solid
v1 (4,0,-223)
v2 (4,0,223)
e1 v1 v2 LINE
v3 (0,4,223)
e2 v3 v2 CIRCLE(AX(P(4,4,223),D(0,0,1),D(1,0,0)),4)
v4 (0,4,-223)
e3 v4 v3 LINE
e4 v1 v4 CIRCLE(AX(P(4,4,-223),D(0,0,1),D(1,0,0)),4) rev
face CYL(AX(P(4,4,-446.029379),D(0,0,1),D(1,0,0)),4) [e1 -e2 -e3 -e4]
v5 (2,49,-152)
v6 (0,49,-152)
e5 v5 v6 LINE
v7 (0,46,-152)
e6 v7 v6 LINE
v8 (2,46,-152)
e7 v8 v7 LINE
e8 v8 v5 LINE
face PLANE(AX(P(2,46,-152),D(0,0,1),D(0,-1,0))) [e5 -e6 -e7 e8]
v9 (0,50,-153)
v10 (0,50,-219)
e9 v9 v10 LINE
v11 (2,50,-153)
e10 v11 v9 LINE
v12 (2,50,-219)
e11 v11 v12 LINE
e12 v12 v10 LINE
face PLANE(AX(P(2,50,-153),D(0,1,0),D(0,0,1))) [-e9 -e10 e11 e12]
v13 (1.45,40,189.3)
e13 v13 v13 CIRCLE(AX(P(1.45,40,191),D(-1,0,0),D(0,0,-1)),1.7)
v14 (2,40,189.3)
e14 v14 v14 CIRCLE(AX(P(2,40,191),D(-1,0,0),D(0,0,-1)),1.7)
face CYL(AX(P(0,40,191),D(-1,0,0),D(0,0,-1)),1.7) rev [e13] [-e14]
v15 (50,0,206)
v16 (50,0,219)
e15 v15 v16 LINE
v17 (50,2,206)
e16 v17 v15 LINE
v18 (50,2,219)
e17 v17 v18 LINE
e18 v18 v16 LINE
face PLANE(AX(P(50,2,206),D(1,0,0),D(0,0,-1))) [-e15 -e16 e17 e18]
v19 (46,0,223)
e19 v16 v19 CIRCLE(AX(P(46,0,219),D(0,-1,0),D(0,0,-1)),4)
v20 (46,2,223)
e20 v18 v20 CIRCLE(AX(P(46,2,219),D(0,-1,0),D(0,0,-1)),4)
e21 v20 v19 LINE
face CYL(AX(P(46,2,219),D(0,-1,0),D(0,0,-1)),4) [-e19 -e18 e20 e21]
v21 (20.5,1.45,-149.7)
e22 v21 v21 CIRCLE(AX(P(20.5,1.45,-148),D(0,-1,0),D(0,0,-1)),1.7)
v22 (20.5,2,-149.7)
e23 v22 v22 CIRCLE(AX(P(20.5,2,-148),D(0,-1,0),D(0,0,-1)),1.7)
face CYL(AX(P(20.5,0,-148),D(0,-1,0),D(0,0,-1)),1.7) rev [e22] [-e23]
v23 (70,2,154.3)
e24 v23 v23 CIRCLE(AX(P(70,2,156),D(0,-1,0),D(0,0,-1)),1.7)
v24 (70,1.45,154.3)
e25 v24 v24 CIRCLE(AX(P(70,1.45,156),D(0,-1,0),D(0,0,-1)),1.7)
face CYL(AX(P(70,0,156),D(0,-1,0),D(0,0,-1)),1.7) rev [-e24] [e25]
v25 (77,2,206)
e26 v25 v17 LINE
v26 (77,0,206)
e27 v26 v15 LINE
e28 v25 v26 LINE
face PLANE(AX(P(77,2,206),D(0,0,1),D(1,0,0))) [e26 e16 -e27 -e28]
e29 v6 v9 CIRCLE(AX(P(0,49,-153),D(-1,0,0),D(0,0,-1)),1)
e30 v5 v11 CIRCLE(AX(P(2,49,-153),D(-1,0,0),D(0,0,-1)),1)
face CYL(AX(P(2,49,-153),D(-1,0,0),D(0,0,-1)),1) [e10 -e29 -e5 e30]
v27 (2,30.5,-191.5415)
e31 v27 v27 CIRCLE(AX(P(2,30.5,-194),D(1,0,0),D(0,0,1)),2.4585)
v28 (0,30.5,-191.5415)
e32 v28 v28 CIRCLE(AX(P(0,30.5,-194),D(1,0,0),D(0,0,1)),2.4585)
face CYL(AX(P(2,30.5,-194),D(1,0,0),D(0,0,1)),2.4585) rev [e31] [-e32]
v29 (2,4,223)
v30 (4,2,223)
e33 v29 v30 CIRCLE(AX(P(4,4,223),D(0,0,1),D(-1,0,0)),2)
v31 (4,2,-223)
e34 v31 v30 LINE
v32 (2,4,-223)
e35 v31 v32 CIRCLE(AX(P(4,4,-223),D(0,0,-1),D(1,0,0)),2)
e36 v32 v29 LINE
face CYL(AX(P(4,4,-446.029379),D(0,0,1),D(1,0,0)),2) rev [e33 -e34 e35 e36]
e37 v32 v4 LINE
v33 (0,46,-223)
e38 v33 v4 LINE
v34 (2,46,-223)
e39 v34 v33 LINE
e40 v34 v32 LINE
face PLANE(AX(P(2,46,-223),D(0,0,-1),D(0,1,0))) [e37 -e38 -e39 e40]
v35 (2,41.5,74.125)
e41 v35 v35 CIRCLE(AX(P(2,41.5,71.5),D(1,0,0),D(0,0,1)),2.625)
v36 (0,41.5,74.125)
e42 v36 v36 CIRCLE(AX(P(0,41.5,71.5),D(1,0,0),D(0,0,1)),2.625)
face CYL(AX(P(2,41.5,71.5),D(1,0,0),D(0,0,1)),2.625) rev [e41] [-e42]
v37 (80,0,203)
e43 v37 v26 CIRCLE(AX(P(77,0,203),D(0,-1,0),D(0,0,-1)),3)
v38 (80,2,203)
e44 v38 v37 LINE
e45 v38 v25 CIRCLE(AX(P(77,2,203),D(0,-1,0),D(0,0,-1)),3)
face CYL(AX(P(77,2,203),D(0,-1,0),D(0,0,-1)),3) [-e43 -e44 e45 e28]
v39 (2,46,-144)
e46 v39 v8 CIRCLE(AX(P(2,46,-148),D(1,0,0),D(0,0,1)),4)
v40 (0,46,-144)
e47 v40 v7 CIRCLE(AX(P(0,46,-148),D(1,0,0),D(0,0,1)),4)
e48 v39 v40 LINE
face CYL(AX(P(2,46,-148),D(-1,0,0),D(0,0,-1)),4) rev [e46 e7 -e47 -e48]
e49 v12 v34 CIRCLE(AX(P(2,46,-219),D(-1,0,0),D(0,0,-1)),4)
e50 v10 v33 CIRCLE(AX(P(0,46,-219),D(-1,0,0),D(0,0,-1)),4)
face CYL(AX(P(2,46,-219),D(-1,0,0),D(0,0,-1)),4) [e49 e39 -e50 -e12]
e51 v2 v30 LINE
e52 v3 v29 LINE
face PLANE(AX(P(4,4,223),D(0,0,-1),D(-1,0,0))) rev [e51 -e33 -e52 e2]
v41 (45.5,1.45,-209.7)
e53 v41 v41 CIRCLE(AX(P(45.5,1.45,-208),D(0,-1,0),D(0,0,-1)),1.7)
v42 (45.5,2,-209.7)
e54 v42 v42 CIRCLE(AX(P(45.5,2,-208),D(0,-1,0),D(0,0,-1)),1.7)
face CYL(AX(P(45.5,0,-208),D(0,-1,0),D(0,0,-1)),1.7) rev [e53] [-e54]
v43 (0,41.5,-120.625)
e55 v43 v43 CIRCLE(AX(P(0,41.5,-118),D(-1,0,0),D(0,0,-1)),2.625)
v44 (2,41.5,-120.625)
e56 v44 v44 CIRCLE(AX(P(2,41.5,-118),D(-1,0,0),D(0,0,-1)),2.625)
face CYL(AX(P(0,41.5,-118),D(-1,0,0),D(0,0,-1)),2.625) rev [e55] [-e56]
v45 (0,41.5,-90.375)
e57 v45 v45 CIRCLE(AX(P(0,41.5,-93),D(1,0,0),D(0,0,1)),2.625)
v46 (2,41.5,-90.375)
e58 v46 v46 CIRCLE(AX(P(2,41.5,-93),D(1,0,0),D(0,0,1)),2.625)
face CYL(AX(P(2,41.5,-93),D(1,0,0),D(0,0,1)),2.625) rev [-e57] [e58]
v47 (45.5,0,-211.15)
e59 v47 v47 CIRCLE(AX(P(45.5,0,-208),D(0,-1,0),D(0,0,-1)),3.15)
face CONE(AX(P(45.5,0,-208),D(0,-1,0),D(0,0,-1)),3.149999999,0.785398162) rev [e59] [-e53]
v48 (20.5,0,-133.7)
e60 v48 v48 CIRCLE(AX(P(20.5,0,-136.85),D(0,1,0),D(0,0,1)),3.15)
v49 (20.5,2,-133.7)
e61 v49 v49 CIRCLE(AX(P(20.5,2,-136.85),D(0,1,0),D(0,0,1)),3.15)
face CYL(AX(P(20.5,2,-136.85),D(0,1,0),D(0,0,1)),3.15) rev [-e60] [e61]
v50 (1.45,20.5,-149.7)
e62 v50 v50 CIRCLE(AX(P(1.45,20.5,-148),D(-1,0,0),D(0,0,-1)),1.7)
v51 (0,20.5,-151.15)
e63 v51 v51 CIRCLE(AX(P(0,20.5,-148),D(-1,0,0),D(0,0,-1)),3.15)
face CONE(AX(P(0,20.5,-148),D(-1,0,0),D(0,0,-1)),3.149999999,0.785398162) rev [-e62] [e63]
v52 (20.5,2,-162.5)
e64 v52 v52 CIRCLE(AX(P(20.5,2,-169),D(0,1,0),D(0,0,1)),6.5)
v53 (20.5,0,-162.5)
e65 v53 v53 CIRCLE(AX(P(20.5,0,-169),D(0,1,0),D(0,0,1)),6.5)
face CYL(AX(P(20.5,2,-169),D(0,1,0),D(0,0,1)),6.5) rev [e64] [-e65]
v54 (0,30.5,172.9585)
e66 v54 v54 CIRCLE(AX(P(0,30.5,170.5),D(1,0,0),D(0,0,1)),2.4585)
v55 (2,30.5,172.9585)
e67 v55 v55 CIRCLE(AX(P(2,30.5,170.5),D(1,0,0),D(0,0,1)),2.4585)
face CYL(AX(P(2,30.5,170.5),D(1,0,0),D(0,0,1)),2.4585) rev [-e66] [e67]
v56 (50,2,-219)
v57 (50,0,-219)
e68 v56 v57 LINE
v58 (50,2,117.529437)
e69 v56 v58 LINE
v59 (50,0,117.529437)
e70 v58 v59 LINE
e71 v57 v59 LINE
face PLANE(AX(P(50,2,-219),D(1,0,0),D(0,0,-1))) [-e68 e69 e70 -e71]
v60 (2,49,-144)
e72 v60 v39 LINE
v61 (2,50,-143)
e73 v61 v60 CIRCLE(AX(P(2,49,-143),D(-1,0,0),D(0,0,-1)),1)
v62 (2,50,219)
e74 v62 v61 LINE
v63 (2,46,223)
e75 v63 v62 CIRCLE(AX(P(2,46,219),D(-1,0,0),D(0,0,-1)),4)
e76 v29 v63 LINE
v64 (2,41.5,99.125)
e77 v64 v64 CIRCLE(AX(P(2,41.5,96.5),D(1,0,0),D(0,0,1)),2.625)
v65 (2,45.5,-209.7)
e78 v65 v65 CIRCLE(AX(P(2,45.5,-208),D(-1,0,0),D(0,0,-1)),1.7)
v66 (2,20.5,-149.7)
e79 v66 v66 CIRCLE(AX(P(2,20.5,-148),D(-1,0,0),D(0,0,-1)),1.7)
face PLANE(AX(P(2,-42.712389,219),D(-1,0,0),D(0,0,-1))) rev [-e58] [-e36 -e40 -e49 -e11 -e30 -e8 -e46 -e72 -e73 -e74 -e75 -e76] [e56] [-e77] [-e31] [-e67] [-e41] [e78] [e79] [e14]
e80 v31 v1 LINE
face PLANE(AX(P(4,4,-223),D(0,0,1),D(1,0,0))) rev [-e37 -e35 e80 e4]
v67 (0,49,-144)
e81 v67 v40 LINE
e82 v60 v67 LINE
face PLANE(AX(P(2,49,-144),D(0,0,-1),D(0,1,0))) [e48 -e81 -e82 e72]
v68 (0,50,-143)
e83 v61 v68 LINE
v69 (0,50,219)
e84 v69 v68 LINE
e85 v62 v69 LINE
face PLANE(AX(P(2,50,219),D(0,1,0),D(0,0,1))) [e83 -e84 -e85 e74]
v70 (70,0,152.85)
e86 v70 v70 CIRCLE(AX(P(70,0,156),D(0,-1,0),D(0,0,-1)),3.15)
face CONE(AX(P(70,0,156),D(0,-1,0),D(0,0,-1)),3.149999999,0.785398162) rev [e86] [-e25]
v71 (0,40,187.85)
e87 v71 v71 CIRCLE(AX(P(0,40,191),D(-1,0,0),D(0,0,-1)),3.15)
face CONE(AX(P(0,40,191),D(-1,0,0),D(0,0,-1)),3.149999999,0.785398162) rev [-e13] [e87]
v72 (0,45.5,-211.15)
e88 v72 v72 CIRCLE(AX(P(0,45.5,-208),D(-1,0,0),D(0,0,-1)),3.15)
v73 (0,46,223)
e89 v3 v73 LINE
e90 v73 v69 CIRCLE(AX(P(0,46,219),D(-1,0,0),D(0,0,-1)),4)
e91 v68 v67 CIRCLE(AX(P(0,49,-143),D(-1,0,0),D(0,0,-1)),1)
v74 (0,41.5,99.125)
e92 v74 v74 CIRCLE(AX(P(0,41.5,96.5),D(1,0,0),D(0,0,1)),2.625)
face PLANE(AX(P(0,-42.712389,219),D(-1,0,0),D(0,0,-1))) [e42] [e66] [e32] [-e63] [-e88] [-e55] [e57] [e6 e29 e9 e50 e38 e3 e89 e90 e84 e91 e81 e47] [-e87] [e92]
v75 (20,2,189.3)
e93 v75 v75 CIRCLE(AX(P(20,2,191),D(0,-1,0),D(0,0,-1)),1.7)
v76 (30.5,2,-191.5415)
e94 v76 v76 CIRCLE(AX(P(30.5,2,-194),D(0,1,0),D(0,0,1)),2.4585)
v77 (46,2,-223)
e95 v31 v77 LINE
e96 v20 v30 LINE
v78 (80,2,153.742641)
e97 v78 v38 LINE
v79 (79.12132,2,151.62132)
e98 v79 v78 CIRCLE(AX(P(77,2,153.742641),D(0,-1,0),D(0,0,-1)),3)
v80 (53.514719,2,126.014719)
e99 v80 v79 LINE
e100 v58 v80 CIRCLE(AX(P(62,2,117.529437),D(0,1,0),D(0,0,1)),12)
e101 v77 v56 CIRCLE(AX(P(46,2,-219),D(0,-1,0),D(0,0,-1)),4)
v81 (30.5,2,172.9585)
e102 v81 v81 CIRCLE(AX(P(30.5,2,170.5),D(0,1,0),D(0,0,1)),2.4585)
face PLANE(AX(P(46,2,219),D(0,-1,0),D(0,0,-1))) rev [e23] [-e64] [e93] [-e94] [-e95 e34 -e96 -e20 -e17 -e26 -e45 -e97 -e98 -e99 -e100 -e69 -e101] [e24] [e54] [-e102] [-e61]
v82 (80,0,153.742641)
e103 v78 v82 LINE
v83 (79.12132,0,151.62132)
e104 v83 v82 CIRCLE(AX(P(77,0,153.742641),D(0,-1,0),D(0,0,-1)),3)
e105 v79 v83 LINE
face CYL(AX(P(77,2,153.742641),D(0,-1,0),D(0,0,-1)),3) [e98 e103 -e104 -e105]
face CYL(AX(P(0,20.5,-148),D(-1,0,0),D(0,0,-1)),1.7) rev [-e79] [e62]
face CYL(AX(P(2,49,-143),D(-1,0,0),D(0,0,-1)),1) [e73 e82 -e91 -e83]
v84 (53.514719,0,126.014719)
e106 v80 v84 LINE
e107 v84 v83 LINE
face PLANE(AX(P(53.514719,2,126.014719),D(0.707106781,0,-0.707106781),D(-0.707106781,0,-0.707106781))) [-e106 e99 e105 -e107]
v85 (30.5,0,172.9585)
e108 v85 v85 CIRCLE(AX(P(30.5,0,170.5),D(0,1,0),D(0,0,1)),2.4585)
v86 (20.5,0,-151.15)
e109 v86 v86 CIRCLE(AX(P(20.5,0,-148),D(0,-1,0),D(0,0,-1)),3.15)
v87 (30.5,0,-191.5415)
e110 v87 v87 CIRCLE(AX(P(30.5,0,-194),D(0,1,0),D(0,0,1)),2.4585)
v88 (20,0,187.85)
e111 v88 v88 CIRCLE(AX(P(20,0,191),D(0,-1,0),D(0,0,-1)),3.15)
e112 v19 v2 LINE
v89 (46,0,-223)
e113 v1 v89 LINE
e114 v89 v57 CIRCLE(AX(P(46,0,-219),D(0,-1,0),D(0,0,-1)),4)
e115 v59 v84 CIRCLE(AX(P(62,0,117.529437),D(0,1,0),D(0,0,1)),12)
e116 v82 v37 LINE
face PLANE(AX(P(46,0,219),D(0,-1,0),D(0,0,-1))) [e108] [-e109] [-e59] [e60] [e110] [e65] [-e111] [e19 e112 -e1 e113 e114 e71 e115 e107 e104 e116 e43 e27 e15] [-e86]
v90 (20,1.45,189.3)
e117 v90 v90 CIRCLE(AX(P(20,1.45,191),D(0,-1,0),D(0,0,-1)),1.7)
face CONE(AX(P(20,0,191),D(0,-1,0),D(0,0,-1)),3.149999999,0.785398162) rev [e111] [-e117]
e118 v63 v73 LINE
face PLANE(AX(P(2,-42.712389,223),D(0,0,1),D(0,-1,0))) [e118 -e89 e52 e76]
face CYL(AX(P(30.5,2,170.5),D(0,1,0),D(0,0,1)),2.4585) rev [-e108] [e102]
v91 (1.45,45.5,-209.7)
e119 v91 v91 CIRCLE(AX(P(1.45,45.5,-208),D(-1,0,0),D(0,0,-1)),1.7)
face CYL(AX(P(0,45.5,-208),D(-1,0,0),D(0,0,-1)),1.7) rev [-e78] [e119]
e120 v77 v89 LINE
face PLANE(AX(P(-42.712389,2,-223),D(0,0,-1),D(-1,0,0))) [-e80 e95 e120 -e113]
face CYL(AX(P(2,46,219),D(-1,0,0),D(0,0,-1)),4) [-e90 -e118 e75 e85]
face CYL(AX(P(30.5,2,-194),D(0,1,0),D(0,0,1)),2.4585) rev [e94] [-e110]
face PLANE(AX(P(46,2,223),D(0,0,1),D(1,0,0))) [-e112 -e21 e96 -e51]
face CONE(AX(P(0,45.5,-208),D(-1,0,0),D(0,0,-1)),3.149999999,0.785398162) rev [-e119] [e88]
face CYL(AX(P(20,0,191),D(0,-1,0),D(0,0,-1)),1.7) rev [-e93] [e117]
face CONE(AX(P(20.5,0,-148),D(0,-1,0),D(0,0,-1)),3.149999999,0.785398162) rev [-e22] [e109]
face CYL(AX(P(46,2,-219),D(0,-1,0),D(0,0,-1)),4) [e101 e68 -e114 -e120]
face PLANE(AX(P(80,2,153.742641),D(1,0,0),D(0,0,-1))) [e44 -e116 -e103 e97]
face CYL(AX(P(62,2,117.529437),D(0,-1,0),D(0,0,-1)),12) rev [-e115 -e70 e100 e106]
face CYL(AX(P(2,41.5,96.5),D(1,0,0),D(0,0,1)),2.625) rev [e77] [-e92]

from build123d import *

# Parameters (mm, degrees)
BOSS_EXTRUDE1_DEPTH                            = 2
HOLE1_D                                        = 5.25
HOLE2_D                                        = 5.25
F_13_0_13_DIAMETER_HOLE1_D                     = 13
F_6_3_6_3_DIAMETER_HOLE1_D                     = 6.3
HOLE3_D                                        = 4.917
CSK_FOR_M3_FLAT_HEAD_MACHINE_SCREW1_AT_2_COUNT = 2
CSK_FOR_M3_FLAT_HEAD_MACHINE_SCREW1_AT_2_PITCH = 399.037905468
CSK_FOR_M3_FLAT_HEAD_MACHINE_SCREW1_AT_3_COUNT = 2
CSK_FOR_M3_FLAT_HEAD_MACHINE_SCREW1_AT_3_PITCH = 56.712388981
CSK_FOR_M3_FLAT_HEAD_MACHINE_SCREW1_AT_4_COUNT = 2
CSK_FOR_M3_FLAT_HEAD_MACHINE_SCREW1_AT_4_PITCH = 407.381733638
CSK_FOR_M3_FLAT_HEAD_MACHINE_SCREW1_AT_5_COUNT = 2
CSK_FOR_M3_FLAT_HEAD_MACHINE_SCREW1_AT_5_PITCH = 343.793917126
CSK_FOR_M3_FLAT_HEAD_MACHINE_SCREW1_AT_6_COUNT = 2
CSK_FOR_M3_FLAT_HEAD_MACHINE_SCREW1_AT_6_PITCH = 112.305538429
CSK_FOR_M3_FLAT_HEAD_MACHINE_SCREW1_AT_7_COUNT = 2
CSK_FOR_M3_FLAT_HEAD_MACHINE_SCREW1_AT_7_PITCH = 339.560377547
SKETCHED_START                                 = -46.712388981
SKETCHED_BEND1_OUTLINE_W                       = 2
SKETCHED_BEND1_OUTLINE_H                       = 446
SKETCHED_BEND1_DEPTH                           = 47.123348981
SKETCHED_START_2                               = 1.400733564
SKETCHED_BEND1_2_OUTLINE_R                     = 1.7
SKETCHED_BEND1_2_OUTLINE_R_2                   = 2.4585
SKETCHED_BEND1_2_OUTLINE_R_3                   = 2.625
SKETCHED_BEND1_2_DEPTH                         = 0.599266436
SKETCHED_BEND1_3_OUTLINE_R                     = 1.7
SKETCHED_BEND1_3_OUTLINE_R_2                   = 2.4585
SKETCHED_BEND1_3_OUTLINE_R_3                   = 2.625
SKETCHED_BEND1_3_DEPTH                         = 4
SKETCHED_START_3                               = -224
SKETCHED_BEND1_4_DEPTH                         = 448


with BuildPart() as part:
    # Sketch5 → Boss-Extrude1 (new body)
    with BuildSketch(Plane.XZ):
        with BuildLine():
            Line((46, 223), (-42.712388981, 223))
            ThreePointArc((-42.712388981, 223), (-45.540816105, 221.828427125), (-46.712388981, 219))
            Line((-46.712388981, 219), (-46.712388981, -143))
            ThreePointArc((-46.712388981, -143), (-46.419495767, -143.707106769), (-45.712388998, -143.999999983))
            Line((-45.712388998, -143.999999983), (-42.712388996, -143.999999983))
            ThreePointArc((-42.712388996, -143.999999983), (-38.712388981, -147.999999998), (-42.712388996, -152.000000013))
            Line((-42.712388996, -152.000000013), (-45.712388993, -152.000000013))
            ThreePointArc((-45.712388993, -152.000000013), (-46.419495765, -152.292893228), (-46.712388981, -153))
            Line((-46.712388981, -153), (-46.712388981, -219))
            ThreePointArc((-46.712388981, -219), (-45.540816105, -221.828427125), (-42.712388981, -223))
            Line((-42.712388981, -223), (46, -223))
            ThreePointArc((46, -223), (48.828427126, -221.828427124), (50.000000002, -218.999999998))
            Line((50.000000002, -218.999999998), (50.000000002, 117.529437254))
            ThreePointArc((50.000000002, 117.529437254), (50.91344561, 122.121638435), (53.514718622, 126.014718614))
            Line((53.514718622, 126.014718614), (79.121320339, 151.621320331))
            ThreePointArc((79.121320339, 151.621320331), (79.771638601, 152.594590389), (80.000000006, 153.742640699))
            Line((80.000000006, 153.742640699), (80.000000006, 203.000000012))
            ThreePointArc((80.000000006, 203.000000012), (79.121320352, 205.12132035), (77.000000014, 206.000000004))
            Line((77.000000014, 206.000000004), (50.000000002, 206.000000004))
            Line((50.000000002, 206.000000004), (50.000000002, 218.999999998))
            ThreePointArc((50.000000002, 218.999999998), (48.828427126, 221.828427124), (46, 223))
        make_face()
    extrude(amount=-BOSS_EXTRUDE1_DEPTH)

    # Hole1 (through all)
    with Locations(Plane(origin=(0, 0, 0), x_dir=(-1, 0, 0), z_dir=(0, -1, 0))):
        with Locations((38.212388981, 118)):
            Hole(HOLE1_D / 2)

    # Hole2 (through all)
    with Locations(Plane(origin=(0, 2, 0), x_dir=(1, 0, 0), z_dir=(0, 1, 0))):
        with Locations((-38.212388981, 93), (-38.212388981, -71.5), (-38.212388981, -96.5)):
            Hole(HOLE2_D / 2)

    # Ø13.0 (13) Diameter Hole1 (through all)
    with Locations(Plane(origin=(0, 2, 0), x_dir=(1, 0, 0), z_dir=(0, 1, 0))):
        with Locations((20.5, 169)):
            Hole(F_13_0_13_DIAMETER_HOLE1_D / 2)

    # Ø6.3 (6.3) Diameter Hole1 (through all)
    with Locations(Plane(origin=(0, 2, 0), x_dir=(1, 0, 0), z_dir=(0, 1, 0))):
        with Locations((20.5, 136.85)):
            Hole(F_6_3_6_3_DIAMETER_HOLE1_D / 2)

    # Hole3 (through all)
    with Locations(Plane(origin=(0, 2, 0), x_dir=(1, 0, 0), z_dir=(0, 1, 0))):
        with Locations((30.5, -170.5), (30.5, 194), (-27.212388981, -170.5), (-27.212388981, 194)):
            Hole(HOLE3_D / 2)

    # Sketch16 → CSK for M3 Flat Head Machine Screw1 (revolve, cut)
    with BuildSketch(Plane(origin=(-36.712388981, 0, 191), x_dir=(0, 0, -1), z_dir=(1, 0, 0))):
        Polygon((0, 0), (0, 2), (1.7, 2), (1.7, 1.450000002), (3.149999999, 0), align=None)
    csk_for_m3_flat_head_machine_screw1 = revolve(axis=Axis((-36.712388981, -6.35, 191), (0, 1, 0)), mode=Mode.SUBTRACT)

    # CSK for M3 Flat Head Machine Screw1 at 2: CSK for M3 Flat Head Machine Screw1 ×2
    with Locations(*[Vector(-0.013783151737312926, 0, -0.999905007852339) * (i * CSK_FOR_M3_FLAT_HEAD_MACHINE_SCREW1_AT_2_PITCH) for i in range(1, CSK_FOR_M3_FLAT_HEAD_MACHINE_SCREW1_AT_2_COUNT)]):
        add(csk_for_m3_flat_head_machine_screw1, mode=Mode.SUBTRACT)

    # CSK for M3 Flat Head Machine Screw1 at 3: CSK for M3 Flat Head Machine Screw1 ×2
    with Locations(*[(i * CSK_FOR_M3_FLAT_HEAD_MACHINE_SCREW1_AT_3_PITCH, 0, 0) for i in range(1, CSK_FOR_M3_FLAT_HEAD_MACHINE_SCREW1_AT_3_COUNT)]):
        add(csk_for_m3_flat_head_machine_screw1, mode=Mode.SUBTRACT)

    # CSK for M3 Flat Head Machine Screw1 at 4: CSK for M3 Flat Head Machine Screw1 ×2
    with Locations(*[Vector(0.20180676302394304, 0, -0.9794253572364757) * (i * CSK_FOR_M3_FLAT_HEAD_MACHINE_SCREW1_AT_4_PITCH) for i in range(1, CSK_FOR_M3_FLAT_HEAD_MACHINE_SCREW1_AT_4_COUNT)]):
        add(csk_for_m3_flat_head_machine_screw1, mode=Mode.SUBTRACT)

    # CSK for M3 Flat Head Machine Screw1 at 5: CSK for M3 Flat Head Machine Screw1 ×2
    with Locations(*[Vector(0.16641477969952015, 0, -0.9860558407603295) * (i * CSK_FOR_M3_FLAT_HEAD_MACHINE_SCREW1_AT_5_PITCH) for i in range(1, CSK_FOR_M3_FLAT_HEAD_MACHINE_SCREW1_AT_5_COUNT)]):
        add(csk_for_m3_flat_head_machine_screw1, mode=Mode.SUBTRACT)

    # CSK for M3 Flat Head Machine Screw1 at 6: CSK for M3 Flat Head Machine Screw1 ×2
    with Locations(*[Vector(0.9501970292191413, 0, -0.31164981255107205) * (i * CSK_FOR_M3_FLAT_HEAD_MACHINE_SCREW1_AT_6_PITCH) for i in range(1, CSK_FOR_M3_FLAT_HEAD_MACHINE_SCREW1_AT_6_COUNT)]):
        add(csk_for_m3_flat_head_machine_screw1, mode=Mode.SUBTRACT)

    # CSK for M3 Flat Head Machine Screw1 at 7: CSK for M3 Flat Head Machine Screw1 ×2
    with Locations(*[Vector(0.057427194953831716, 0, -0.9983496968896894) * (i * CSK_FOR_M3_FLAT_HEAD_MACHINE_SCREW1_AT_7_PITCH) for i in range(1, CSK_FOR_M3_FLAT_HEAD_MACHINE_SCREW1_AT_7_COUNT)]):
        add(csk_for_m3_flat_head_machine_screw1, mode=Mode.SUBTRACT)

    # Sketched Bend1: read off the stored shape, not the designer's step
    # Sketched Bend1 outline → Sketched Bend1 (cut)
    with BuildSketch(Plane.YZ.offset(SKETCHED_START)):
        with Locations((1, 0)):
            Rectangle(SKETCHED_BEND1_OUTLINE_W, SKETCHED_BEND1_OUTLINE_H)
    extrude(amount=SKETCHED_BEND1_DEPTH, mode=Mode.SUBTRACT)

    # Sketched Bend1 2 outline → Sketched Bend1 2 (add)
    with BuildSketch(Plane.YZ.offset(SKETCHED_START_2)):
        with BuildLine():
            Line((2, -223), (46, -223))
            ThreePointArc((46, -223), (48.828427125, -221.828427125), (50, -219))
            Line((50, -219), (50, -153))
            ThreePointArc((50, -153), (49.707106785, -152.292893228), (49.000000013, -152.000000012))
            Line((49.000000013, -152.000000012), (46.000000015, -152.000000012))
            ThreePointArc((46.000000015, -152.000000012), (42, -147.999999997), (46.000000015, -143.999999983))
            Line((46.000000015, -143.999999983), (49.000000017, -143.999999983))
            ThreePointArc((49.000000017, -143.999999983), (49.707106786, -143.707106769), (50, -143))
            Line((50, -143), (50, 219))
            ThreePointArc((50, 219), (48.828427125, 221.828427125), (46, 223))
            Line((46, 223), (2, 223))
            Line((2, 223), (2, -223))
        make_face()
        with Locations((20.5, -148)):
            Circle(SKETCHED_BEND1_2_OUTLINE_R, mode=Mode.SUBTRACT)
        with Locations((30.5, -194)):
            Circle(SKETCHED_BEND1_2_OUTLINE_R_2, mode=Mode.SUBTRACT)
        with Locations((45.5, -208)):
            Circle(SKETCHED_BEND1_2_OUTLINE_R, mode=Mode.SUBTRACT)
        with Locations((41.5, -118)):
            Circle(SKETCHED_BEND1_2_OUTLINE_R_3, mode=Mode.SUBTRACT)
        with Locations((41.5, -93)):
            Circle(SKETCHED_BEND1_2_OUTLINE_R_3, mode=Mode.SUBTRACT)
        with Locations((41.5, 71.5)):
            Circle(SKETCHED_BEND1_2_OUTLINE_R_3, mode=Mode.SUBTRACT)
        with Locations((41.5, 96.5)):
            Circle(SKETCHED_BEND1_2_OUTLINE_R_3, mode=Mode.SUBTRACT)
        with Locations((30.5, 170.5)):
            Circle(SKETCHED_BEND1_2_OUTLINE_R_2, mode=Mode.SUBTRACT)
        with Locations((40, 191)):
            Circle(SKETCHED_BEND1_2_OUTLINE_R, mode=Mode.SUBTRACT)
    extrude(amount=SKETCHED_BEND1_2_DEPTH)

    # Sketched Bend1 3 outline → Sketched Bend1 3 (add)
    with BuildSketch(Plane.YZ):
        with BuildLine():
            Line((2, -223), (46, -223))
            ThreePointArc((46, -223), (48.828427125, -221.828427125), (50, -219))
            Line((50, -219), (50, -153))
            ThreePointArc((50, -153), (49.707106785, -152.292893228), (49.000000013, -152.000000012))
            Line((49.000000013, -152.000000012), (46.000000015, -152.000000012))
            ThreePointArc((46.000000015, -152.000000012), (42, -147.999999997), (46.000000015, -143.999999983))
            Line((46.000000015, -143.999999983), (49.000000017, -143.999999983))
            ThreePointArc((49.000000017, -143.999999983), (49.707106786, -143.707106769), (50, -143))
            Line((50, -143), (50, 219))
            ThreePointArc((50, 219), (48.828427125, 221.828427125), (46, 223))
            Line((46, 223), (2, 223))
            Line((2, 223), (2, -223))
        make_face()
        with Locations((20.5, -148)):
            Circle(SKETCHED_BEND1_3_OUTLINE_R, mode=Mode.SUBTRACT)
        with Locations((30.5, -194)):
            Circle(SKETCHED_BEND1_3_OUTLINE_R_2, mode=Mode.SUBTRACT)
        with Locations((45.5, -208)):
            Circle(SKETCHED_BEND1_3_OUTLINE_R, mode=Mode.SUBTRACT)
        with Locations((41.5, -118)):
            Circle(SKETCHED_BEND1_3_OUTLINE_R_3, mode=Mode.SUBTRACT)
        with Locations((41.5, -93)):
            Circle(SKETCHED_BEND1_3_OUTLINE_R_3, mode=Mode.SUBTRACT)
        with Locations((41.5, 71.5)):
            Circle(SKETCHED_BEND1_3_OUTLINE_R_3, mode=Mode.SUBTRACT)
        with Locations((41.5, 96.5)):
            Circle(SKETCHED_BEND1_3_OUTLINE_R_3, mode=Mode.SUBTRACT)
        with Locations((30.5, 170.5)):
            Circle(SKETCHED_BEND1_3_OUTLINE_R_2, mode=Mode.SUBTRACT)
        with Locations((40, 191)):
            Circle(SKETCHED_BEND1_3_OUTLINE_R, mode=Mode.SUBTRACT)
    extrude(amount=SKETCHED_BEND1_3_DEPTH)

    # Sketched Bend1 4 outline → Sketched Bend1 4 (cut)
    with BuildSketch(Plane.XY.offset(SKETCHED_START_3)):
        with BuildLine():
            Line((4, 50), (2, 50))
            Line((2, 50), (2, 4))
            ThreePointArc((2, 4), (2.585786437, 2.585786437), (4, 2))
            Line((4, 2), (4, 50))
        make_face()
        with BuildLine():
            ThreePointArc((4, 0), (1.171572875, 1.171572875), (0, 4))
            Line((0, 4), (0, 2))
            Line((0, 2), (0.41096, 2))
            Line((0.41096, 2), (0.41096, 0))
            Line((0.41096, 0), (4, 0))
        make_face()
    extrude(amount=SKETCHED_BEND1_4_DEPTH, mode=Mode.SUBTRACT)

    # Sketched Bend1 5 outline → Sketched Bend1 5 (revolve, cut)
    with BuildSketch(Plane(origin=(0, 20.5, -148), x_dir=(0, 1, 0), z_dir=(0, 0, -1))):
        Polygon((3.149999999, 0), (1.7, 1.450000002), (1.7, 0), align=None)
    revolve(axis=Axis((0, 20.5, -148), (1, 0, 0)), mode=Mode.SUBTRACT)

    # Sketched Bend1 6 outline → Sketched Bend1 6 (revolve, cut)
    with BuildSketch(Plane(origin=(0, 45.5, -208), x_dir=(0, 1, 0), z_dir=(0, 0, -1))):
        Polygon((3.149999999, 0), (1.7, 1.450000002), (1.7, 0), align=None)
    revolve(axis=Axis((0, 45.5, -208), (1, 0, 0)), mode=Mode.SUBTRACT)

    # Sketched Bend1 7 outline → Sketched Bend1 7 (revolve, cut)
    with BuildSketch(Plane(origin=(0, 40, 191), x_dir=(0, 1, 0), z_dir=(0, 0, -1))):
        Polygon((3.149999999, 0), (1.7, 1.450000002), (1.7, 0), align=None)
    revolve(axis=Axis((0, 40, 191), (1, 0, 0)), mode=Mode.SUBTRACT)


solid = part.part
